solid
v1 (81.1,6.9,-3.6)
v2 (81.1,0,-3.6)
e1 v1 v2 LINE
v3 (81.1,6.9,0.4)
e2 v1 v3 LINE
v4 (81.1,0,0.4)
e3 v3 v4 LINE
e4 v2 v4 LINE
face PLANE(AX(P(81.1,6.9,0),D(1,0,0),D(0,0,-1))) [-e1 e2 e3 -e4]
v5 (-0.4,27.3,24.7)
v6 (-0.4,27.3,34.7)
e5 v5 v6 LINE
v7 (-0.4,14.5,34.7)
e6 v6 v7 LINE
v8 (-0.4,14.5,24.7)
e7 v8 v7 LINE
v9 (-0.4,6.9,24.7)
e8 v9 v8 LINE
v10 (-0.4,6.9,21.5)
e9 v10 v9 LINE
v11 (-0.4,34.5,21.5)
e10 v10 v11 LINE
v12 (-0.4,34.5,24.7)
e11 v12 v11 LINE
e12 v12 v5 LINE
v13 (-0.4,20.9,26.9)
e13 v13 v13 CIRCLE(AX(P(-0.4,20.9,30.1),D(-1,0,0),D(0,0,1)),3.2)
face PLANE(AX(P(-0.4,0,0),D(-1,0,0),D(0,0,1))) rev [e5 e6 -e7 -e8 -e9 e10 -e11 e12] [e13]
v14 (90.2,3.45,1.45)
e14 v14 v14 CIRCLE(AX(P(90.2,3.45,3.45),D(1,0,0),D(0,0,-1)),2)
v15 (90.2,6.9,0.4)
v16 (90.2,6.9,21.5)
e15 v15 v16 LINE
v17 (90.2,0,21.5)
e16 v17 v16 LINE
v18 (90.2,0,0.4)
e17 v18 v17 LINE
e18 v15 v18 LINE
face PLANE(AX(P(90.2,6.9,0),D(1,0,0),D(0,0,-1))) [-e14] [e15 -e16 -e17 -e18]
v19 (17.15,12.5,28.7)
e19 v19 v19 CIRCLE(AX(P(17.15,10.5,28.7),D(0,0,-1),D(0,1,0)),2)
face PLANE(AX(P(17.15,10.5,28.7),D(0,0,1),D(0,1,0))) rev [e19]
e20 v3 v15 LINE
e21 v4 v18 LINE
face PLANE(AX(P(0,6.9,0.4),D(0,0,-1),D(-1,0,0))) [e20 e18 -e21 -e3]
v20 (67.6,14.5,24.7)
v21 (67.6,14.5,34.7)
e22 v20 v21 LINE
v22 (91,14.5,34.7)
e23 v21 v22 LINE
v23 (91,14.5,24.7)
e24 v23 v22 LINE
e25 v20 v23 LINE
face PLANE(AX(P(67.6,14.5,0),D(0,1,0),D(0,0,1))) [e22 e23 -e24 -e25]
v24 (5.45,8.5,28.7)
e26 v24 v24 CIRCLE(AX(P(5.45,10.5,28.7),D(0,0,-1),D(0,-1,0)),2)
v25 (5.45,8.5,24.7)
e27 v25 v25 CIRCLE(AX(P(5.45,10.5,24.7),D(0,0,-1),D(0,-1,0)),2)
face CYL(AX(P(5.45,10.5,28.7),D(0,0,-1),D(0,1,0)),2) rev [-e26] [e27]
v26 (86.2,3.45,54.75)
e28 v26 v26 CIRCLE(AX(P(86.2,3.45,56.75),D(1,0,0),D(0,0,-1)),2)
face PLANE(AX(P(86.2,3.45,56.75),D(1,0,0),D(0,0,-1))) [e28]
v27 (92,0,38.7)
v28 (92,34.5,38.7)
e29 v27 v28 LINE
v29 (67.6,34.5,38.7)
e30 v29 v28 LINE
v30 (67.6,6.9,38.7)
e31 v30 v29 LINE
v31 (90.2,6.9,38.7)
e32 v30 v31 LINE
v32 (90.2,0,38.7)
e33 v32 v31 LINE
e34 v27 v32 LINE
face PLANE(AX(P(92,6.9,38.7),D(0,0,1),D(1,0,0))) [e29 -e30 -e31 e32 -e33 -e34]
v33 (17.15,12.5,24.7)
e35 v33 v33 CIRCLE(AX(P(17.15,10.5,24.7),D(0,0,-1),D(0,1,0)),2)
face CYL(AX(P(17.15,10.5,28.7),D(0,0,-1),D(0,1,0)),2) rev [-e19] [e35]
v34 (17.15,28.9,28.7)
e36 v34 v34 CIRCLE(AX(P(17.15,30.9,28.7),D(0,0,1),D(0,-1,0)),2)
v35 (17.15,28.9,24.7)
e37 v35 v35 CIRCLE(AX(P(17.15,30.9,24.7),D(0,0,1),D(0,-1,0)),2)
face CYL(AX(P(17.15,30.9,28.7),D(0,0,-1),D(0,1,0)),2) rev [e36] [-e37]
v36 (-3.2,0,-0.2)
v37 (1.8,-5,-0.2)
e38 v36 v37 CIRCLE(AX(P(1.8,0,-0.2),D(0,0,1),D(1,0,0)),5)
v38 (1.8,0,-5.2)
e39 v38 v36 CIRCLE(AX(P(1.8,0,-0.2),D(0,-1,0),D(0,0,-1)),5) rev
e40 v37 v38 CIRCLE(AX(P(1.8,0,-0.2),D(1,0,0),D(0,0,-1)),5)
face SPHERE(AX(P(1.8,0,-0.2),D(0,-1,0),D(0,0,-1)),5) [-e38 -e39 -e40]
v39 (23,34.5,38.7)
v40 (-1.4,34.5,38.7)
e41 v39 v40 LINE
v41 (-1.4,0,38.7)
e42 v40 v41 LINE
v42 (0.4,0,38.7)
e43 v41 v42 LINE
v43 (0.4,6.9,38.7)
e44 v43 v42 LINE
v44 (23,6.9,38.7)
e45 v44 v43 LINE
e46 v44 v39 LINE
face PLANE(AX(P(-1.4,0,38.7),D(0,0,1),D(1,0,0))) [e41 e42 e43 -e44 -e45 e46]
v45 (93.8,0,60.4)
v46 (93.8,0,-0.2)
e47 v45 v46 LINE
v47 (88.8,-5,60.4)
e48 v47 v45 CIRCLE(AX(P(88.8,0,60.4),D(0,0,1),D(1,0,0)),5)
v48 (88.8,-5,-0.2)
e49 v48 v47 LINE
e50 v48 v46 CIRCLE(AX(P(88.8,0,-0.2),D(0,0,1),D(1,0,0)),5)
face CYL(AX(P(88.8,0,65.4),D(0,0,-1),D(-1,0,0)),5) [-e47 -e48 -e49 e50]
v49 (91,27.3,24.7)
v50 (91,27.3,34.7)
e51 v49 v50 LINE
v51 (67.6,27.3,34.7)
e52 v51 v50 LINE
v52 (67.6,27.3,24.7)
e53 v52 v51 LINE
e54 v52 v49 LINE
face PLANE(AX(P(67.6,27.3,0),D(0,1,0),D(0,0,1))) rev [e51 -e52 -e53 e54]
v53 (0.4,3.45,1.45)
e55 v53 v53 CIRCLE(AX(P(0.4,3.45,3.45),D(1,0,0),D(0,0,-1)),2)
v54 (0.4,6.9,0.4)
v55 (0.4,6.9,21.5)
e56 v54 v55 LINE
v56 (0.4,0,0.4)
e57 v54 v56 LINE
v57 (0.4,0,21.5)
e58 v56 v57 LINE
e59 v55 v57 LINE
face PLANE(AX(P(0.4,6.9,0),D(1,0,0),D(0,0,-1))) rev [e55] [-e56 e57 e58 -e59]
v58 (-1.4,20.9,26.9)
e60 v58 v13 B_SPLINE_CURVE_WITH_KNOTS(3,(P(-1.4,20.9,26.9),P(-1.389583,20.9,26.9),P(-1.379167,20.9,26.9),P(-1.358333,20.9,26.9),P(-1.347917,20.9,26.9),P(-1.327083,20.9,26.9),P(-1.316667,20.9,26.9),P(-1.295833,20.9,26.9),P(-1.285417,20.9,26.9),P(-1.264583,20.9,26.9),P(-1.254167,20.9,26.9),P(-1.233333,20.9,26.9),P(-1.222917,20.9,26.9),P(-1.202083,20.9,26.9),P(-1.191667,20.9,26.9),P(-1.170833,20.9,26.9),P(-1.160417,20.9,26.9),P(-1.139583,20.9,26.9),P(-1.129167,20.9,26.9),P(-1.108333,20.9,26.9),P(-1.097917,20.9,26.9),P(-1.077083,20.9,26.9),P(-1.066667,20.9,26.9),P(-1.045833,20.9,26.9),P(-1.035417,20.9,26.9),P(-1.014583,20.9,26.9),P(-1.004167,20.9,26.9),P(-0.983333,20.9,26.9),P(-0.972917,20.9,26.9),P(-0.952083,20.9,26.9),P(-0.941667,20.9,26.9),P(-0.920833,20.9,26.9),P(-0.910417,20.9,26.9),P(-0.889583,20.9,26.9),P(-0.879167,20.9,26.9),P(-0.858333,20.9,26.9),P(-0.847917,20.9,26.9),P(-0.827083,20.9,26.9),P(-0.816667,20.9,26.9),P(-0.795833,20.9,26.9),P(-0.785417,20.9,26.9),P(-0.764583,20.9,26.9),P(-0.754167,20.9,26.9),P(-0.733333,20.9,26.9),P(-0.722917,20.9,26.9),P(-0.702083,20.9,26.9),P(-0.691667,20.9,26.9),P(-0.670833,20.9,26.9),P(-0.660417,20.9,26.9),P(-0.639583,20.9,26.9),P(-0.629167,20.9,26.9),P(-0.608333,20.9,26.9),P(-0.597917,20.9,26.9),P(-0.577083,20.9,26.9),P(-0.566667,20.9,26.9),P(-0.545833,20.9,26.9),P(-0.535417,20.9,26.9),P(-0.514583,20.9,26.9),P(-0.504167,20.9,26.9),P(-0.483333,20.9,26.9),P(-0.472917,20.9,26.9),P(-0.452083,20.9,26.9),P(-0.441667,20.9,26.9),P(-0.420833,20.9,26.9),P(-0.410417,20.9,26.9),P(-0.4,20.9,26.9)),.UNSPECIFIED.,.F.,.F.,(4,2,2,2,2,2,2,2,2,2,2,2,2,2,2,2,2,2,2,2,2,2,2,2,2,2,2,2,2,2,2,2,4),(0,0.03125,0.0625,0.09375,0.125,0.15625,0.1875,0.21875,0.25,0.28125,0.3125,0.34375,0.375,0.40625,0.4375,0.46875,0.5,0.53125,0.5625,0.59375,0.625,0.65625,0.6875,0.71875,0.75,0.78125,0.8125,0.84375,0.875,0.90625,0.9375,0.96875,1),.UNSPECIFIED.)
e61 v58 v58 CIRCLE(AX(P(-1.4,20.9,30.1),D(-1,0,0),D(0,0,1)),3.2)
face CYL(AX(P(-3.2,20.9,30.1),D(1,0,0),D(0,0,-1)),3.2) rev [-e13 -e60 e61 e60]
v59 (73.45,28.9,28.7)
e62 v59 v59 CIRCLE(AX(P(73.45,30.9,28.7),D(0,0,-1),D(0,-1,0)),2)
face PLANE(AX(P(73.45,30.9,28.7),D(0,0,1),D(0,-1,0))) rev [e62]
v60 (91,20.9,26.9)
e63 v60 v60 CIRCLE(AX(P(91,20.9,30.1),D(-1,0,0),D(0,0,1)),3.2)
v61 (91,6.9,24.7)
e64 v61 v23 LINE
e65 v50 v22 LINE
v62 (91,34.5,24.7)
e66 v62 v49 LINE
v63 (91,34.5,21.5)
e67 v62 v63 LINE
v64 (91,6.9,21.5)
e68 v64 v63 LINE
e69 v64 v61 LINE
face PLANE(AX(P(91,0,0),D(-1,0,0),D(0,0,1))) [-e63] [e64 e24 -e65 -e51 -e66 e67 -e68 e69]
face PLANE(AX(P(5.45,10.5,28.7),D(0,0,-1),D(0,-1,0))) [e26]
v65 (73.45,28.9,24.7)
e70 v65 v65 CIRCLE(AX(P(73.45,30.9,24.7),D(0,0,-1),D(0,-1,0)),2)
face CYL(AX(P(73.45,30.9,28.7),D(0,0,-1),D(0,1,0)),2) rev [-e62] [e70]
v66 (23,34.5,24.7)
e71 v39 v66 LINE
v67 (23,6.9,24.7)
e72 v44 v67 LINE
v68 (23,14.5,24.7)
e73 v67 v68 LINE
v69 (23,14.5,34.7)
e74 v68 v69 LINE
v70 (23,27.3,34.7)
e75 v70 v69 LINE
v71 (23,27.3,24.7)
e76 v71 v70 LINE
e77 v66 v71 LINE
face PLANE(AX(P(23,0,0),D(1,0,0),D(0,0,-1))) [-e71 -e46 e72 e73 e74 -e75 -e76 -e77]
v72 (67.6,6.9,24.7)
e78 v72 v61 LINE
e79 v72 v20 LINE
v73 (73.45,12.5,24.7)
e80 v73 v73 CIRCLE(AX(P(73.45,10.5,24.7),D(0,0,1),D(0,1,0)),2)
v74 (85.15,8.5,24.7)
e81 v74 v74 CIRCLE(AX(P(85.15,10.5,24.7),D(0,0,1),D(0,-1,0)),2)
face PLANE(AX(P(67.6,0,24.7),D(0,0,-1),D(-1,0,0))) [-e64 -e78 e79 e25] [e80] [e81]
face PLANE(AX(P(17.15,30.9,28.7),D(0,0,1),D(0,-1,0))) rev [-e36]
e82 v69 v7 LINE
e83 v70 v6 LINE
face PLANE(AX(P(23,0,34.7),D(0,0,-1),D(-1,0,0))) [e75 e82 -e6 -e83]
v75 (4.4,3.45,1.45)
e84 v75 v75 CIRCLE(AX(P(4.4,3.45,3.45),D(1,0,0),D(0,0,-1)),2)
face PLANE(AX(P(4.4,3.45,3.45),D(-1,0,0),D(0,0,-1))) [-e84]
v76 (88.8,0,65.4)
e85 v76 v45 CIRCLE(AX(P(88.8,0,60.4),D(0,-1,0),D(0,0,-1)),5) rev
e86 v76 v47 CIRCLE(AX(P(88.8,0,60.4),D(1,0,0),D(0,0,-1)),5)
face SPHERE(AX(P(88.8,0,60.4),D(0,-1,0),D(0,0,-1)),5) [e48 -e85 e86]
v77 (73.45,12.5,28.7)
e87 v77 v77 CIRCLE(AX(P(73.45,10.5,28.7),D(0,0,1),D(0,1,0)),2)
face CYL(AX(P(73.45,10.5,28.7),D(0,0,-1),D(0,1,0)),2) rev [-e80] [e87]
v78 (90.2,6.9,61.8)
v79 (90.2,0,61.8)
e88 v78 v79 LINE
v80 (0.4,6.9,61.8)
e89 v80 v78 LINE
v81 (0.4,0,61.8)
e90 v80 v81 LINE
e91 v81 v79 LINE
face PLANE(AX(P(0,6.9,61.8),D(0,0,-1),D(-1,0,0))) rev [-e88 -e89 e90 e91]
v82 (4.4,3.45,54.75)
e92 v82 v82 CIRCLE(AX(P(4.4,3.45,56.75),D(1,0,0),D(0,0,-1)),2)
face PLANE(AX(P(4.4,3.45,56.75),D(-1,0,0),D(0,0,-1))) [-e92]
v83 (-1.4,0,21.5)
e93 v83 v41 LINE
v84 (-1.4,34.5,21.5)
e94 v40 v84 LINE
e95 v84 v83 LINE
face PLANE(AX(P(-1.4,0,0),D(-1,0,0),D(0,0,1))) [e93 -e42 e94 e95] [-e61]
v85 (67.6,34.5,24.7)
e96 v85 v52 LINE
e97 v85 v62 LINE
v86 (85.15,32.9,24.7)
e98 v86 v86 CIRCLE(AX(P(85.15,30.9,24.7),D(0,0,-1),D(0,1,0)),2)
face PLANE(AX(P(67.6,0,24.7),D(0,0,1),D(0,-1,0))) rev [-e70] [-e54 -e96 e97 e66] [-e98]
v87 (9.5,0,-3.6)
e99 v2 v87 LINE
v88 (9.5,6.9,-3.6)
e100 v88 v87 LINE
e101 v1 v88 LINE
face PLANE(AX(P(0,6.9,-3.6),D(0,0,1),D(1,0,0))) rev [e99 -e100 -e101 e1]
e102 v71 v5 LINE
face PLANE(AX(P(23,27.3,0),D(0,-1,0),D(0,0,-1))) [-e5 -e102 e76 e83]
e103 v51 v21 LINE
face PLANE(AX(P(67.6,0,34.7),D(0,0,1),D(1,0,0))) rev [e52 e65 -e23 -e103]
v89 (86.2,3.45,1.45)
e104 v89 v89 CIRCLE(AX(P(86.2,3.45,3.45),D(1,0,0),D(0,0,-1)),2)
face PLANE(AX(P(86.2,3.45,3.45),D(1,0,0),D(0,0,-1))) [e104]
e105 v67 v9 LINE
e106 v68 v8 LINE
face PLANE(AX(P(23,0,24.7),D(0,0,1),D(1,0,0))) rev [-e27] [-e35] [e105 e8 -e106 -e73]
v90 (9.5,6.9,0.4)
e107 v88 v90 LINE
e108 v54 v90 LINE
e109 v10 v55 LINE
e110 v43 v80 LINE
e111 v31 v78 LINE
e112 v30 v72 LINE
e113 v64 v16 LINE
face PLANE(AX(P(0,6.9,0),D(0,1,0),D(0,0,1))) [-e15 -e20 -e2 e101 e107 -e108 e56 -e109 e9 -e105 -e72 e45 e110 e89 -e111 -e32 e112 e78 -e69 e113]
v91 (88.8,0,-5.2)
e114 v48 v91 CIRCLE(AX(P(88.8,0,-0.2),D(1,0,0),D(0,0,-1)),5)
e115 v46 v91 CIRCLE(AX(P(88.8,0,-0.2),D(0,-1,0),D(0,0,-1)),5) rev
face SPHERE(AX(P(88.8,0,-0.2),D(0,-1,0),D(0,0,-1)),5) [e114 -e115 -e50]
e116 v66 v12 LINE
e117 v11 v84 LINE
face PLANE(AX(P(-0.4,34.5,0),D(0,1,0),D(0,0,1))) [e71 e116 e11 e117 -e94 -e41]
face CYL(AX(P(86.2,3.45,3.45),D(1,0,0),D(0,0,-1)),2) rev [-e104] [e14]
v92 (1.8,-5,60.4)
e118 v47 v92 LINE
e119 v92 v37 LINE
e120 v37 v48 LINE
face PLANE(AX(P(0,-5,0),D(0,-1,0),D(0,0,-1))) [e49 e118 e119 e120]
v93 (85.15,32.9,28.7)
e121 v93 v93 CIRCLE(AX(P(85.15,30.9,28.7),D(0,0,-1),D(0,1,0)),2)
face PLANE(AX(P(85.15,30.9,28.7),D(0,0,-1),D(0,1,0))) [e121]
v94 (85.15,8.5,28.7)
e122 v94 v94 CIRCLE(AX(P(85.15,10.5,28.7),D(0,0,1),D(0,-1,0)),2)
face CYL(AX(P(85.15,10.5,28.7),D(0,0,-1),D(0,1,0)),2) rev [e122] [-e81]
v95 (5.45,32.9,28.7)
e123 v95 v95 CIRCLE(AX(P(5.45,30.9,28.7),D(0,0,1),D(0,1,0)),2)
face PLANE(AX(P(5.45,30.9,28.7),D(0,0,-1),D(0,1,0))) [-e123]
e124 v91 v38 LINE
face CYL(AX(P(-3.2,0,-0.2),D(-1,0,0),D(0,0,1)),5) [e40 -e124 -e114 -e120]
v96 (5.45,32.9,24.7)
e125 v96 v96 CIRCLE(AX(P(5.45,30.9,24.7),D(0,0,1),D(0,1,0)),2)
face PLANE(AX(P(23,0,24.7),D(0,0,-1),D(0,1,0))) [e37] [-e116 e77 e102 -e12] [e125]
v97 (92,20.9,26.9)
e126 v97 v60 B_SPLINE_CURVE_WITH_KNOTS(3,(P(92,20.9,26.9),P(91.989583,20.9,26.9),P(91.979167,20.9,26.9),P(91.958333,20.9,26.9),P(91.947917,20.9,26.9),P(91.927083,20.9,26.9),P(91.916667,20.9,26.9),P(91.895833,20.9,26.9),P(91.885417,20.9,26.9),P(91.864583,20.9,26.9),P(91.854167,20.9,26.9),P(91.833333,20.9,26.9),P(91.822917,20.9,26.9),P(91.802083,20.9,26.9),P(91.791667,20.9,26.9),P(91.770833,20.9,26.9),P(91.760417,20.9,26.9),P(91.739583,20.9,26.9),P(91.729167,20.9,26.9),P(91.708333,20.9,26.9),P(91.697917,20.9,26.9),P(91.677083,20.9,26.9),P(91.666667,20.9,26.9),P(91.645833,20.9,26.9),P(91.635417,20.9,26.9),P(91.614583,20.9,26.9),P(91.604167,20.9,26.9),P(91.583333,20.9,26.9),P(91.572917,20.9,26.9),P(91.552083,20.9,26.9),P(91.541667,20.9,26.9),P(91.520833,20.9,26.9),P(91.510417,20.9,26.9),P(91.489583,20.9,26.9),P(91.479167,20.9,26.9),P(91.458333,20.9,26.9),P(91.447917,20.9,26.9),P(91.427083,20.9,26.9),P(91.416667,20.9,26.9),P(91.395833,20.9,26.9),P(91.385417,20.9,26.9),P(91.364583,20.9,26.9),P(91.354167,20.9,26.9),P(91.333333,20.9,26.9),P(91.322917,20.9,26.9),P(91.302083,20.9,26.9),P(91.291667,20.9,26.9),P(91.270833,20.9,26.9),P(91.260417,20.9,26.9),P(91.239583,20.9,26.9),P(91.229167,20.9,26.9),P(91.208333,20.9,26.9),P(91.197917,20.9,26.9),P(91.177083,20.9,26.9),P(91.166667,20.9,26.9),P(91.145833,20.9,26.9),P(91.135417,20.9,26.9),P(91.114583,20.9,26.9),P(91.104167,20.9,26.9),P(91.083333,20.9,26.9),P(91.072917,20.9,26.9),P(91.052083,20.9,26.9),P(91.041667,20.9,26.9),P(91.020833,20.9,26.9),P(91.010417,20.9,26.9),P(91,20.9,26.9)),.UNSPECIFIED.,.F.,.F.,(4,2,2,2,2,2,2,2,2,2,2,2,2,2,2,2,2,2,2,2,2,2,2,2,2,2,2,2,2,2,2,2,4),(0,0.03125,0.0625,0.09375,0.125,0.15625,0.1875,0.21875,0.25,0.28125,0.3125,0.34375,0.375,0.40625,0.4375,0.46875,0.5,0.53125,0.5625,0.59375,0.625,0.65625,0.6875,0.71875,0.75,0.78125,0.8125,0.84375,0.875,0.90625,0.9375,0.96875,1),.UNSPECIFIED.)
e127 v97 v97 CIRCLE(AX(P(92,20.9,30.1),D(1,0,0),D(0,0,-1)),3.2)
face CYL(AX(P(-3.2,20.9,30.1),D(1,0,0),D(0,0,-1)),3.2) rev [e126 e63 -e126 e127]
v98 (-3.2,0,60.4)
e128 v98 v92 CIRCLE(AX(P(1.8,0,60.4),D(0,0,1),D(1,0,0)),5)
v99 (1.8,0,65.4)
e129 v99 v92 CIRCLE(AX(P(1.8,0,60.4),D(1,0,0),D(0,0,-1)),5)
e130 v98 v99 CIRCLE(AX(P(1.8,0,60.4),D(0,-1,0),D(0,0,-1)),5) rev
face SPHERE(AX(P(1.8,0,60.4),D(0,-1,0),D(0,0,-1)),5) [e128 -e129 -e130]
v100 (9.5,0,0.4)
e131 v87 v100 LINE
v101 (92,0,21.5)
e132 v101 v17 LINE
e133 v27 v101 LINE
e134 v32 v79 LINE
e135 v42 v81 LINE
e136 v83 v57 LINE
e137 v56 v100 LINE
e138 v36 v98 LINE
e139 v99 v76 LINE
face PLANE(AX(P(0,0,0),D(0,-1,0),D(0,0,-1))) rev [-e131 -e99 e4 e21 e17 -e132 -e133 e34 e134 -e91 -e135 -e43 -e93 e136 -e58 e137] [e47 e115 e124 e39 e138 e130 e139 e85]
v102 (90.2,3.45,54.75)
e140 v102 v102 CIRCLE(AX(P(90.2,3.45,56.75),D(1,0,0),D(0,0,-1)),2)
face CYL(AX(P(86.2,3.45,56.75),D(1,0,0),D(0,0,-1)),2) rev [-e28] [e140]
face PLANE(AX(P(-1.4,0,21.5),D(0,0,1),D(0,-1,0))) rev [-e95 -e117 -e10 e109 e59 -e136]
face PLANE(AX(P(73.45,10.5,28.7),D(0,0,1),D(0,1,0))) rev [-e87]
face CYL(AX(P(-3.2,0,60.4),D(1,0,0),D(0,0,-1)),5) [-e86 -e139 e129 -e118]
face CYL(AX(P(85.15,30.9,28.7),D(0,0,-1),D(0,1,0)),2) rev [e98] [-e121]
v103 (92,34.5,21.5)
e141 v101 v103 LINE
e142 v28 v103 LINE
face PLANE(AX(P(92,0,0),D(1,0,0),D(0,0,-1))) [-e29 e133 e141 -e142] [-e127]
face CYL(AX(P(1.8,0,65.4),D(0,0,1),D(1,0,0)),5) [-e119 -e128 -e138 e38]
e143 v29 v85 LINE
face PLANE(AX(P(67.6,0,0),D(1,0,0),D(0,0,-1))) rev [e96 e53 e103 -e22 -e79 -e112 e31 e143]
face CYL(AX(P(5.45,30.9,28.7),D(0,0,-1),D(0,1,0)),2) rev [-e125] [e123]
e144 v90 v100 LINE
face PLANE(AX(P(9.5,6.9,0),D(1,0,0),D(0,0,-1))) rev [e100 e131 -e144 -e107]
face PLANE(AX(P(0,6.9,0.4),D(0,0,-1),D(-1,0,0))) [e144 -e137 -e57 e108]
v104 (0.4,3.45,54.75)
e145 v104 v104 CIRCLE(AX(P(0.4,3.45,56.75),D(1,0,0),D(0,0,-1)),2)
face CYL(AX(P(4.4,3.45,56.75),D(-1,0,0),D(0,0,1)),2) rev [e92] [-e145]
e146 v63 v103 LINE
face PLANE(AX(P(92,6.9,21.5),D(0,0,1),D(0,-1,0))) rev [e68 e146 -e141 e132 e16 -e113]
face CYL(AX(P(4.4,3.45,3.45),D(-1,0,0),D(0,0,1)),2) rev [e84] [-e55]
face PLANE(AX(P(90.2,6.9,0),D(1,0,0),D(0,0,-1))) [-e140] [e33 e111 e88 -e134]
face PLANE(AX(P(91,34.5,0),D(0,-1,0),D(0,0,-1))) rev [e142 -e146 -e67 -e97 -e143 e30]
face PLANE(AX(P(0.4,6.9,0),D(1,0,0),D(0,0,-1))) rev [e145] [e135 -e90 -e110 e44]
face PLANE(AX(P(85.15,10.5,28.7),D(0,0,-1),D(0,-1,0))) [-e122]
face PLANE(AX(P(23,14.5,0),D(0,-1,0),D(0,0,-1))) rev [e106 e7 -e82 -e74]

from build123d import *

# Parameters (mm, degrees)
SKETCH1_W               = 89.8
SKETCH1_H               = 61.4
BOSS_EXTRUDE1_DEPTH     = 6.9
SKETCH2_R               = 2
CUT_EXTRUDE1_DEPTH      = 4
SKETCH3_W               = 97
SKETCH3_H               = 70.6
BOSS_EXTRUDE2_DEPTH     = 5
SKETCH5_W               = 10.4
SKETCH5_H               = 6.9
SKETCH5_W_2             = 3.4
BOSS_EXTRUDE3_DEPTH     = 1.8
BOSS_EXTRUDE4_START     = 1.8
SKETCH5_3_W             = 10.4
SKETCH5_3_H             = 6.9
SKETCH5_3_H_2           = 27.6
SKETCH5_3_W_2           = 3.4
BOSS_EXTRUDE4_DEPTH     = 1
BOSS_EXTRUDE6_START     = -89.8
SKETCH5_5_W             = 3.4
SKETCH5_5_H             = 6.9
SKETCH5_5_W_2           = 10.4
BOSS_EXTRUDE6_DEPTH     = 1.8
BOSS_EXTRUDE7_START     = -91.6
SKETCH5_7_W             = 3.4
SKETCH5_7_H             = 6.9
SKETCH5_7_H_2           = 27.6
SKETCH5_7_W_2           = 10.4
BOSS_EXTRUDE7_DEPTH     = 1
CUT_EXTRUDE2_DEPTH      = 120.754123102
CUT_EXTRUDE2_DEPTH_BACK = 120.754123102
SKETCH6_R               = 3.2
BOSS_EXTRUDE9_START     = -24.4
BOSS_EXTRUDE9_DEPTH     = 23.4
BOSS_EXTRUDE10_START    = -92.4
SKETCH7_4_W             = 10
SKETCH7_4_H             = 7.6
SKETCH7_4_W_2           = 4
SKETCH7_4_H_2           = 7.2
BOSS_EXTRUDE10_DEPTH    = 23.4
SKETCH9_R               = 2
CUT_EXTRUDE3_DEPTH      = 4
MIRROR4_COPY_1_SKETCH_R = 2
MIRROR4_COPY_1_DEPTH    = 4
FILLET1_R               = 5
FILLET2_R               = 5
SKETCH12_R              = 2
CUT_EXTRUDE6_DEPTH      = 4


with BuildPart() as part:
    # Sketch1 → Boss-Extrude1 (new body)
    with BuildSketch(Plane(origin=(0, 0, 0), x_dir=(1, 0, 0), z_dir=(0, 1, 0))):
        with Locations((45.3, -31.1)):
            Rectangle(SKETCH1_W, SKETCH1_H)
        Polygon((81.1, 0), (81.1, 3.6), (9.5, 3.6), (9.5, 0), (9.5, -0.4), (81.1, -0.4), align=None)
    extrude(amount=BOSS_EXTRUDE1_DEPTH)

    # Sketch2 → Cut-Extrude1 (cut)
    with BuildSketch(Plane(origin=(90.2, 0, 0), x_dir=(0, 0, -1), z_dir=(1, 0, 0))):
        with Locations((-3.45, 3.45)):
            Circle(SKETCH2_R)
    cut_extrude1 = extrude(amount=-CUT_EXTRUDE1_DEPTH, mode=Mode.SUBTRACT)

    # Mirror1: Cut-Extrude1 across plane
    add(cut_extrude1.mirror(Plane(origin=(45.3, 0, 0), x_dir=(0, 0, 1), z_dir=(1, 0, 0))), mode=Mode.SUBTRACT)

    # Sketch3 → Boss-Extrude2 (add)
    with BuildSketch(Plane(origin=(0, 0, 0), x_dir=(1, 0, 0), z_dir=(0, 1, 0))):
        with Locations((45.3, -30.1)):
            Rectangle(SKETCH3_W, SKETCH3_H)
    extrude(amount=-BOSS_EXTRUDE2_DEPTH)

    # Sketch5 → Boss-Extrude3 (add)
    with BuildSketch(Plane.ZY.offset(-0.4)):
        with Locations((30.1, 3.45)):
            Rectangle(SKETCH5_W, SKETCH5_H)
        with Locations((23.2, 3.45)):
            Rectangle(SKETCH5_W_2, SKETCH5_H)
        with Locations((37, 3.45)):
            Rectangle(SKETCH5_W_2, SKETCH5_H)
    extrude(amount=BOSS_EXTRUDE3_DEPTH)

    # Sketch5<3> → Boss-Extrude4 (add)
    with BuildSketch(Plane.ZY.offset(-0.4).offset(BOSS_EXTRUDE4_START)):
        with Locations((30.1, 3.45)):
            Rectangle(SKETCH5_3_W, SKETCH5_3_H)
        with Locations((30.1, 20.7)):
            Rectangle(SKETCH5_3_W, SKETCH5_3_H_2)
        with Locations((23.2, 20.7)):
            Rectangle(SKETCH5_3_W_2, SKETCH5_3_H_2)
        with Locations((23.2, 3.45)):
            Rectangle(SKETCH5_3_W_2, SKETCH5_3_H)
        with Locations((37, 3.45)):
            Rectangle(SKETCH5_3_W_2, SKETCH5_3_H)
        with Locations((37, 20.7)):
            Rectangle(SKETCH5_3_W_2, SKETCH5_3_H_2)
    extrude(amount=-BOSS_EXTRUDE4_DEPTH)

    # Sketch5<5> → Boss-Extrude6 (add)
    with BuildSketch(Plane.ZY.offset(-0.4).offset(BOSS_EXTRUDE6_START)):
        with Locations((23.2, 3.45)):
            Rectangle(SKETCH5_5_W, SKETCH5_5_H)
        with Locations((37, 3.45)):
            Rectangle(SKETCH5_5_W, SKETCH5_5_H)
        with Locations((30.1, 3.45)):
            Rectangle(SKETCH5_5_W_2, SKETCH5_5_H)
    extrude(amount=-BOSS_EXTRUDE6_DEPTH)

    # Sketch5<7> → Boss-Extrude7 (add)
    with BuildSketch(Plane.ZY.offset(-0.4).offset(BOSS_EXTRUDE7_START)):
        with Locations((37, 3.45)):
            Rectangle(SKETCH5_7_W, SKETCH5_7_H)
        with Locations((37, 20.7)):
            Rectangle(SKETCH5_7_W, SKETCH5_7_H_2)
        with Locations((30.1, 20.7)):
            Rectangle(SKETCH5_7_W_2, SKETCH5_7_H_2)
        with Locations((23.2, 20.7)):
            Rectangle(SKETCH5_7_W, SKETCH5_7_H_2)
        with Locations((23.2, 3.45)):
            Rectangle(SKETCH5_7_W, SKETCH5_7_H)
        with Locations((30.1, 3.45)):
            Rectangle(SKETCH5_7_W_2, SKETCH5_7_H)
    extrude(amount=BOSS_EXTRUDE7_DEPTH)

    # Sketch6 → Cut-Extrude2 (cut, two sides: drawn at the far end of the back side and taken through both)
    with BuildSketch(Plane(origin=(-0.4, 0, 0), x_dir=(0, 0, -1), z_dir=(1, 0, 0)).offset(-CUT_EXTRUDE2_DEPTH_BACK)):
        with Locations((-30.1, 20.9)):
            Circle(SKETCH6_R)
    extrude(amount=CUT_EXTRUDE2_DEPTH + CUT_EXTRUDE2_DEPTH_BACK, mode=Mode.SUBTRACT)

    # Sketch7 → Boss-Extrude9 (add)
    with BuildSketch(Plane(origin=(92, 0, 0), x_dir=(0, 0, -1), z_dir=(1, 0, 0)).offset(BOSS_EXTRUDE9_START)):
        Polygon((-38.7, 34.5), (-38.7, 6.9), (-24.7, 6.9), (-24.7, 14.5), (-34.7, 14.5), (-34.7, 27.3), (-24.7, 27.3), (-24.7, 34.5), align=None)
    extrude(amount=BOSS_EXTRUDE9_DEPTH)

    # Sketch7<4> → Boss-Extrude10 (add)
    with BuildSketch(Plane(origin=(92, 0, 0), x_dir=(0, 0, -1), z_dir=(1, 0, 0)).offset(BOSS_EXTRUDE10_START)):
        with Locations((-29.7, 10.7)):
            Rectangle(SKETCH7_4_W, SKETCH7_4_H)
        with Locations((-36.7, 10.7)):
            Rectangle(SKETCH7_4_W_2, SKETCH7_4_H)
        with Locations((-36.7, 30.9)):
            Rectangle(SKETCH7_4_W_2, SKETCH7_4_H_2)
        with Locations((-29.7, 30.9)):
            Rectangle(SKETCH7_4_W, SKETCH7_4_H_2)
        Polygon((-38.7, 27.3), (-38.7, 20.9), (-38.7, 14.5), (-34.7, 14.5), (-34.7, 27.3), align=None)
    extrude(amount=BOSS_EXTRUDE10_DEPTH)

    # Sketch9 → Cut-Extrude3 (cut)
    with BuildSketch(Plane(origin=(0, 0, 24.7), x_dir=(-1, 0, 0), z_dir=(0, 0, -1))):
        with Locations(Location((-85.15, 30.9, 0), (0, 0, 90))):
            Circle(SKETCH9_R)
        with Locations(Location((-73.45, 30.9, 0), (0, 0, 270))):
            Circle(SKETCH9_R)
    cut_extrude3 = extrude(amount=-CUT_EXTRUDE3_DEPTH, mode=Mode.SUBTRACT)

    # Mirror3: Cut-Extrude3 across plane
    add(cut_extrude3.mirror(Plane(origin=(45.3, 0, 0), x_dir=(0, 0, 1), z_dir=(1, 0, 0))), mode=Mode.SUBTRACT)

    # Mirror4: Cut-Extrude3 across plane
    add(cut_extrude3.mirror(Plane.ZX.offset(20.7)), mode=Mode.SUBTRACT)

    # Mirror4 copy 1 sketch → Mirror4 copy 1 (cut)
    with BuildSketch(Plane(origin=(90.6, 41.4, 24.7), x_dir=(1, 0, 0), z_dir=(0, 0, -1))):
        with Locations(Location((-85.15, 30.9, 0), (0, 0, 90))):
            Circle(MIRROR4_COPY_1_SKETCH_R)
        with Locations(Location((-73.45, 30.9, 0), (0, 0, 270))):
            Circle(MIRROR4_COPY_1_SKETCH_R)
    extrude(amount=-MIRROR4_COPY_1_DEPTH, mode=Mode.SUBTRACT)

    # Fillet1
    fillet1_edges = [part.edges().sort_by_distance(p)[0] for p in [
        (93.8, -2.5, -5.2),
        (93.8, -2.5, 65.4),
        (-3.2, -2.5, 65.4),
        (-3.2, -2.5, -5.2),
    ]]
    fillet(fillet1_edges, radius=FILLET1_R)

    # Fillet2
    fillet2_edges = [part.edges().sort_by_distance(p)[0] for p in [
        (92.335533906, -5, 63.935533906),
        (93.8, -5, 30.1),
        (92.335533906, -5, -3.735533906),
        (45.3, -5, -5.2),
        (-1.735533906, -5, -3.735533906),
        (-3.2, -5, 30.1),
        (-1.735533906, -5, 63.935533906),
        (45.3, -5, 65.4),
    ]]
    fillet(fillet2_edges, radius=FILLET2_R - 0.0001)  # a hair under: the kernel refuses the full size

    # Sketch12 → Cut-Extrude6 (cut)
    with BuildSketch(Plane(origin=(90.2, 0, 0), x_dir=(0, 0, -1), z_dir=(1, 0, 0))):
        with Locations((-56.75, 3.45)):
            Circle(SKETCH12_R)
    cut_extrude6 = extrude(amount=-CUT_EXTRUDE6_DEPTH, mode=Mode.SUBTRACT)

    # Mirror5: Cut-Extrude6 across plane
    add(cut_extrude6.mirror(Plane(origin=(45.3, 0, 0), x_dir=(0, 0, 1), z_dir=(1, 0, 0))), mode=Mode.SUBTRACT)


solid = part.part
